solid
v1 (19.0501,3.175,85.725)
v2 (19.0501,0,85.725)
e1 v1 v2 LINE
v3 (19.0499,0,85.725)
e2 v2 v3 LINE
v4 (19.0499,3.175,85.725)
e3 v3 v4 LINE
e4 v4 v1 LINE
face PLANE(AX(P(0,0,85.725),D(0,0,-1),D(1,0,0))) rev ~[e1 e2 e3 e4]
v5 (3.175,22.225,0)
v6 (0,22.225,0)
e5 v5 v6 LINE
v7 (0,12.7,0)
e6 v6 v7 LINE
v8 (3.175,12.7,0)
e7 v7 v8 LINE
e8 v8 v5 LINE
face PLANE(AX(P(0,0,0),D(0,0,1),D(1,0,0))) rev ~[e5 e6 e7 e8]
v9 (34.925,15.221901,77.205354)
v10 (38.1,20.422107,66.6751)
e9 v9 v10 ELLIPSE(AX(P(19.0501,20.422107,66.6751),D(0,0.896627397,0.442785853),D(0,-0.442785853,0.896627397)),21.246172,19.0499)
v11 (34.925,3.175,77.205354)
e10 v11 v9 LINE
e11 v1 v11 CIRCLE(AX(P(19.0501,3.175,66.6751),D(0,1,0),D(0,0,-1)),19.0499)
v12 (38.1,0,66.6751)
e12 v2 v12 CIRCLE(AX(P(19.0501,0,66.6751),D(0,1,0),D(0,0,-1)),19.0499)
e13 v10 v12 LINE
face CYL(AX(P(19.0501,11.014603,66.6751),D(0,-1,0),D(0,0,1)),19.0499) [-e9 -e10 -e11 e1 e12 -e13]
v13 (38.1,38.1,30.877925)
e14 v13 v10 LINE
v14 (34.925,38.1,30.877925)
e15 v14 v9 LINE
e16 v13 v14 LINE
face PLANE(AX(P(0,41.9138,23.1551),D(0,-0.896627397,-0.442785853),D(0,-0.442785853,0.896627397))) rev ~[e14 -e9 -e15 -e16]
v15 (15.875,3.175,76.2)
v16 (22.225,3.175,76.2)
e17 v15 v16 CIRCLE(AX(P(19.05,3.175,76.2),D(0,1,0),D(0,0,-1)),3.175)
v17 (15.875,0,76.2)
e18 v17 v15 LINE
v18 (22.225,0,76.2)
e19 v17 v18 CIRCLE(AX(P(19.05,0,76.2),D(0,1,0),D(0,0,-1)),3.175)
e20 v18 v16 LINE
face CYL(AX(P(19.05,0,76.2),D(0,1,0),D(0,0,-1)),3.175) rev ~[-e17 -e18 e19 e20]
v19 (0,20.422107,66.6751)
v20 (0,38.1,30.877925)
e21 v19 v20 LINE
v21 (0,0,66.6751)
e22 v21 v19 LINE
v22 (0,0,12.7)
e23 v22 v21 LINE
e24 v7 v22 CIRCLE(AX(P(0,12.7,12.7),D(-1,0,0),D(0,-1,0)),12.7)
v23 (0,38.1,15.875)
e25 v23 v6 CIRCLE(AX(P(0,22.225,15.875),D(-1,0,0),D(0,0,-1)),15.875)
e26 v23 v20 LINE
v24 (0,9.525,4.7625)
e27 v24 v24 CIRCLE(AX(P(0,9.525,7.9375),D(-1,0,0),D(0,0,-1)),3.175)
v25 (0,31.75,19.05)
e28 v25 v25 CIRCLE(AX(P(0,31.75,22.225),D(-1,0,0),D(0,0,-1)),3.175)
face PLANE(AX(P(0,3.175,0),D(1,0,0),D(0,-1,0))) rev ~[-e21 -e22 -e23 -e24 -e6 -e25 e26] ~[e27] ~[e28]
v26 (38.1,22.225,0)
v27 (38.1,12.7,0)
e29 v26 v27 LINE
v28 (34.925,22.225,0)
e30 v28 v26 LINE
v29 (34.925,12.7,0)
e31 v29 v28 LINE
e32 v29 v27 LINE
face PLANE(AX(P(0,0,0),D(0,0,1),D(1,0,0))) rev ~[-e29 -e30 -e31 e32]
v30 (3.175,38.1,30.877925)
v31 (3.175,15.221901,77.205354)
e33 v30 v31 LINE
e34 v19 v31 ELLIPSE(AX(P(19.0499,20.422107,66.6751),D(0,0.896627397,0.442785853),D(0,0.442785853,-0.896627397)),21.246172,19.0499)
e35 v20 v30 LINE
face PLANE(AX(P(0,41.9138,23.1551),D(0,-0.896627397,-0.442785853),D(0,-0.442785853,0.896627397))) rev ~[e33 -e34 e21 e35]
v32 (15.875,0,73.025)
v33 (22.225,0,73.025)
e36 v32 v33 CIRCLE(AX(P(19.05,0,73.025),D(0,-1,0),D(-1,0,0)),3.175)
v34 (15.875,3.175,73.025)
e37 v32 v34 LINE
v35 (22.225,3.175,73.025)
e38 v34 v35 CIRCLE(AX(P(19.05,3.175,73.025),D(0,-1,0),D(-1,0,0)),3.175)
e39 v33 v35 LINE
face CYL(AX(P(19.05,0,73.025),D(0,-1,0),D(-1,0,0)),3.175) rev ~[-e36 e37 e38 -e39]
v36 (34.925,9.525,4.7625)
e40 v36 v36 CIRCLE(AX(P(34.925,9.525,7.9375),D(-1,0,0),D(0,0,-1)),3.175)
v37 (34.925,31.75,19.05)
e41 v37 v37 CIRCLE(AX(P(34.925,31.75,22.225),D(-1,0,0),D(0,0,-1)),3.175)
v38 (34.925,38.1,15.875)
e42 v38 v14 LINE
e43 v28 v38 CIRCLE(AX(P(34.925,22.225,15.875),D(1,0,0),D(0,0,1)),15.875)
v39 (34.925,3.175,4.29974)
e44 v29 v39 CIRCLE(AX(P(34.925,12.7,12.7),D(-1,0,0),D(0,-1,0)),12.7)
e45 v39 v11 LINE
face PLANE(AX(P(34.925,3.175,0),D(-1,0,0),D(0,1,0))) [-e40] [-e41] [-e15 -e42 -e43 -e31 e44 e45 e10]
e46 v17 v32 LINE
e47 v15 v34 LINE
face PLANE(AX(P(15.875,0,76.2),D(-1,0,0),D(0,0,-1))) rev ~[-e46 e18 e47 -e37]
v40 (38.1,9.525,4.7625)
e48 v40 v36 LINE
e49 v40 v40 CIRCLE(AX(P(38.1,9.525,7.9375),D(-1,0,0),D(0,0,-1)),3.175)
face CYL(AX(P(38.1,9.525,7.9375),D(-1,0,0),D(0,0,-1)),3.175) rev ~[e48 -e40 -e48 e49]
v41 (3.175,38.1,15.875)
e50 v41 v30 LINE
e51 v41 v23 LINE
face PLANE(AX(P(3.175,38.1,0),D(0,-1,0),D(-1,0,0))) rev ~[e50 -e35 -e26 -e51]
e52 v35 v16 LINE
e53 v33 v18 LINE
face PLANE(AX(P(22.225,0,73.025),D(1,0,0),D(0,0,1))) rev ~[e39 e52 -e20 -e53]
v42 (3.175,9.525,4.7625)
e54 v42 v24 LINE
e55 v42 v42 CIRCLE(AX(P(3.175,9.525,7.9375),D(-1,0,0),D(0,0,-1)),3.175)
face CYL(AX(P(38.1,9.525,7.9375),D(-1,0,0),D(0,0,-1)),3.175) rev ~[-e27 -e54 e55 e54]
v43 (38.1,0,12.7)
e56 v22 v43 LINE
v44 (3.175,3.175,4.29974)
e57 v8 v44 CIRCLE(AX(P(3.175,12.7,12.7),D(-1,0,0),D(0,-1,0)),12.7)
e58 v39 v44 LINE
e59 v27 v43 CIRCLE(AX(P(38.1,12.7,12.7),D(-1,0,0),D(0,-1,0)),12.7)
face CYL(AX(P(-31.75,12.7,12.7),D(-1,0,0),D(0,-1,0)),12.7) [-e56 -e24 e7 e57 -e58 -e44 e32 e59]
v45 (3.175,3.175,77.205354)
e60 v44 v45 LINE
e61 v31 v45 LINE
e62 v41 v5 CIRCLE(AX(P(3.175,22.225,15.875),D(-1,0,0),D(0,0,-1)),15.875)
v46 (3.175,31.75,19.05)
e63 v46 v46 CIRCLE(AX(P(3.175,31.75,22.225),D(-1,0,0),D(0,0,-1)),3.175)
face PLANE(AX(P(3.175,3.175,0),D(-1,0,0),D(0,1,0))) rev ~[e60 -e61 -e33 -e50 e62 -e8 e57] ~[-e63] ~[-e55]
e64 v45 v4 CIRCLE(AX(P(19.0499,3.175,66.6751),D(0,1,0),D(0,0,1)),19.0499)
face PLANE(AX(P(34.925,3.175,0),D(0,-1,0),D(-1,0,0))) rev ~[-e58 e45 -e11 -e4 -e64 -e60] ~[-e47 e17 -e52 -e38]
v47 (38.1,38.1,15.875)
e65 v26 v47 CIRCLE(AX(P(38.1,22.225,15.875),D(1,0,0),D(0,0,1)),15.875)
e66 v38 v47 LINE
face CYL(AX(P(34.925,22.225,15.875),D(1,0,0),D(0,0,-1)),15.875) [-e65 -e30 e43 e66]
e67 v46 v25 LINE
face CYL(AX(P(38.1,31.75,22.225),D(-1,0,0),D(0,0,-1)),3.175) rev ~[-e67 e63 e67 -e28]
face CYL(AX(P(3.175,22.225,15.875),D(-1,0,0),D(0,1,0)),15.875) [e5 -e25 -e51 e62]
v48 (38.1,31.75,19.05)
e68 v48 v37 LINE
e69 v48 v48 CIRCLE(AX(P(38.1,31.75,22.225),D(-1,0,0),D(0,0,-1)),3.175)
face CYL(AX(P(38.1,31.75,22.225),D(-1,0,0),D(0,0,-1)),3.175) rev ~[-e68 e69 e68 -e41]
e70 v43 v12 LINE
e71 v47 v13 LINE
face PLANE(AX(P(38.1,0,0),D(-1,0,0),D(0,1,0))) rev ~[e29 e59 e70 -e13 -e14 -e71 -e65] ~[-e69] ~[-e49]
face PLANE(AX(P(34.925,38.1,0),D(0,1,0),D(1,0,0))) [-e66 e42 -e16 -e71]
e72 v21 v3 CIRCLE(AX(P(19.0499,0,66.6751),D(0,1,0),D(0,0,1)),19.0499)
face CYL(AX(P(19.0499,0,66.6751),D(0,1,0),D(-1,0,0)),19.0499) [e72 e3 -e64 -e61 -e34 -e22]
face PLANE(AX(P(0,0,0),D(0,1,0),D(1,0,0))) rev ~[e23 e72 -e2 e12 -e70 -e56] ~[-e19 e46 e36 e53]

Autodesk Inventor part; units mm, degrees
ref_plane "YZ Plane" through (0, 0, 0) normal (1, 0, 0) x (0, 1, 0)
ref_plane "XZ Plane" through (0, 0, 0) normal (0, 1, 0) x (-1, 0, 0)
ref_plane "XY Plane" through (0, 0, 0) normal (0, 0, 1) x (1, 0, 0)
sketch "Sketch1" plane through (0, 0, 0) normal (0, 0, 1) x (1, 0, 0)
  line L0 (0, 0) -> (3.175, 0)
  line L1 (3.175, 0) -> (3.175, 38.1)
  line L2 (3.175, 38.1) -> (0, 38.1)
  line L3 (0, 38.1) -> (0, 0)
  line L4 (0, 0) -> (38.1, 0)
  line L5 (38.1, 0) -> (38.1, 3.175)
  line L6 (38.1, 3.175) -> (0, 3.175)
  line L7 (0, 3.175) -> (0, 0)
  line L8 (38.1, 0) -> (34.925, 0)
  line L9 (34.925, 0) -> (34.925, 38.1)
  line L10 (34.925, 38.1) -> (38.1, 38.1)
  line L11 (38.1, 38.1) -> (38.1, 0)
  dimension "d0" = 3.175
  dimension "d1" = 38.1
  dimension "d2" = 38.1
  dimension "d3" = 3.175
  dimension "d4" = 3.175
  dimension "d5" = 38.1
extrude "Extrusion1" add sketch "Sketch1" along normal blind 101.6
sketch "Sketch2" plane through (38.1, 0, 0) normal (1, 0, 0) x (0, 0, -1)
  line L0 (-101.6, 3.175) -> (0, 3.175) projected
  line L1 (0, 0) -> (0, 38.1) projected
  point P0 (-7.9375, 9.525)
  dimension "d8" = 6.35
  dimension "d9" = 7.9375
hole "Hole1" at (38.1, 9.525, 7.9375) direction (-1, 0, 0) diameter 6.35 end through all
sketch "Sketch3" plane through (38.1, 0, 0) normal (1, 0, 0) x (0, 0, -1)
  line L0 (0, 38.1) -> (-101.6, 38.1) projected
  line L1 (0, 0) -> (0, 38.1) projected
  point P0 (-22.225, 31.75)
  dimension "d17" = 6.35
  dimension "d18" = 22.225
hole "Hole2" at (38.1, 31.75, 22.225) direction (-1, 0, 0) diameter 6.35 end through all
ref_plane "Work Plane1" through (19.05, 3.175, 0) normal (-1, 0, 0) x (0, 0, 1)
fillet "Fillet1" radius 12.7 1 edges at (19.05, 0, 0)
sketch "Sketch4" plane through (0, 0, 101.6) normal (-1, 0, 0) x (0, 0, 1)
  line L0 (-78.4449, 41.9138) -> (31.1063, -12.1864)
  line L1 (31.1063, -12.1864) -> (58.2522, 42.7832)
  line L2 (58.2522, 42.7832) -> (-51.299, 96.8833)
  line L3 (-51.299, 96.8833) -> (-78.4449, 41.9138)
  arc A0 (-101.6, 12.7) -> (-88.9, 0) centre (-88.9, 12.7) ccw projected
  line L4 (-88.9, 0) -> (0, 0) projected
  line L5 (0, 38.1) -> (0, 0) projected
  line L6 (-101.6, 38.1) -> (0, 38.1) projected
  line L7 (-101.6, 38.1) -> (-101.6, 12.7) projected
  circle A1 centre (-79.375, 31.75) radius 3.175 projected
  circle A2 centre (-93.6625, 9.525) radius 3.175 projected
  line L8 (-97.3003, 3.175) -> (0, 3.175) projected
  point P0 (-101.6, 0)
  dimension "d27" = 9.525
  dimension "d28" = 6.35
extrude "Extrusion2" cut sketch "Sketch4" against normal through all contours L5 L6 L0 L3 L2 L1 | L0 L6 L5
fillet "Fillet2" radius 15.875 2 edges at (1.5875, 38.1, 0) (36.5125, 38.1, 0)
sketch "Sketch5" plane through (0, 0, 101.6) normal (0, -1, 0) x (1, 0, 0)
  line L0 (0, -88.9) -> (0, 0) projected
  point P0 (0, -101.6)
  point P1 (19.05, -25.4)
  dimension "d32" = 19.05
  dimension "d40" = 76.2
hole "Hole3" at (19.05, 0, 76.2) direction (0, 1, 0) diameter 6.35 end through all
sketch "Sketch6" plane through (0, 0, 101.6) normal (0, -1, 0) x (1, 0, 0)
  circle A0 centre (19.05, -25.4) radius 3.175
  circle A1 centre (19.05, -25.4) radius 3.175 projected
  line L0 (38.1, -88.9) -> (0, -88.9) projected
  line L1 (38.1, -88.9) -> (38.1, 0) projected
  line L2 (0, 0) -> (38.1, 0) projected
  line L3 (0, -88.9) -> (0, 0) projected
  line L4 (-11.1164, -15.875) -> (47.1756, -15.875)
  line L5 (47.1756, -15.875) -> (47.1756, 8.1032)
  line L6 (47.1756, 8.1032) -> (-11.1164, 8.1032)
  line L7 (-11.1164, 8.1032) -> (-11.1164, -15.875)
  point P0 (0, -101.6)
  dimension "d41" = 9.525
  dimension "d42" = 6.35
extrude "Extrusion3" cut sketch "Sketch6" against normal through all contours L4 L3 L2 L1 | L1 L2 L3 L4 L7 L6 L5
fillet "Fillet3" radius 19.05 2 edges at (0, 5.5073, 85.725) (38.1, 5.5073, 85.725)
sketch "Sketch7" plane through (0, 0, 12.7) normal (0, -1, 0) x (1, 0, 0)
  circle A0 centre (19.05, 63.5) radius 3.175 projected
  line L0 (19.05, 63.5) -> (19.05, 60.325) construction
  line L1 (15.875, 63.5) -> (15.875, 60.325)
  line L2 (22.225, 60.325) -> (22.225, 63.5)
  arc A1 (22.225, 63.5) -> (15.875, 63.5) centre (19.05, 63.5) ccw
  arc A2 (15.875, 60.325) -> (22.225, 60.325) centre (19.05, 60.325) ccw
  point P0 (0, -12.7)
  point P1 (19.05, 61.9125)
  dimension "d46" = 3.175
extrude "Extrusion4" cut sketch "Sketch7" against normal blind 25.4 contours L2 A2 L1 A0
properties part number "CAR_048_NewCarouselTensioner1.5UChannel" material "Aluminum 6061"
